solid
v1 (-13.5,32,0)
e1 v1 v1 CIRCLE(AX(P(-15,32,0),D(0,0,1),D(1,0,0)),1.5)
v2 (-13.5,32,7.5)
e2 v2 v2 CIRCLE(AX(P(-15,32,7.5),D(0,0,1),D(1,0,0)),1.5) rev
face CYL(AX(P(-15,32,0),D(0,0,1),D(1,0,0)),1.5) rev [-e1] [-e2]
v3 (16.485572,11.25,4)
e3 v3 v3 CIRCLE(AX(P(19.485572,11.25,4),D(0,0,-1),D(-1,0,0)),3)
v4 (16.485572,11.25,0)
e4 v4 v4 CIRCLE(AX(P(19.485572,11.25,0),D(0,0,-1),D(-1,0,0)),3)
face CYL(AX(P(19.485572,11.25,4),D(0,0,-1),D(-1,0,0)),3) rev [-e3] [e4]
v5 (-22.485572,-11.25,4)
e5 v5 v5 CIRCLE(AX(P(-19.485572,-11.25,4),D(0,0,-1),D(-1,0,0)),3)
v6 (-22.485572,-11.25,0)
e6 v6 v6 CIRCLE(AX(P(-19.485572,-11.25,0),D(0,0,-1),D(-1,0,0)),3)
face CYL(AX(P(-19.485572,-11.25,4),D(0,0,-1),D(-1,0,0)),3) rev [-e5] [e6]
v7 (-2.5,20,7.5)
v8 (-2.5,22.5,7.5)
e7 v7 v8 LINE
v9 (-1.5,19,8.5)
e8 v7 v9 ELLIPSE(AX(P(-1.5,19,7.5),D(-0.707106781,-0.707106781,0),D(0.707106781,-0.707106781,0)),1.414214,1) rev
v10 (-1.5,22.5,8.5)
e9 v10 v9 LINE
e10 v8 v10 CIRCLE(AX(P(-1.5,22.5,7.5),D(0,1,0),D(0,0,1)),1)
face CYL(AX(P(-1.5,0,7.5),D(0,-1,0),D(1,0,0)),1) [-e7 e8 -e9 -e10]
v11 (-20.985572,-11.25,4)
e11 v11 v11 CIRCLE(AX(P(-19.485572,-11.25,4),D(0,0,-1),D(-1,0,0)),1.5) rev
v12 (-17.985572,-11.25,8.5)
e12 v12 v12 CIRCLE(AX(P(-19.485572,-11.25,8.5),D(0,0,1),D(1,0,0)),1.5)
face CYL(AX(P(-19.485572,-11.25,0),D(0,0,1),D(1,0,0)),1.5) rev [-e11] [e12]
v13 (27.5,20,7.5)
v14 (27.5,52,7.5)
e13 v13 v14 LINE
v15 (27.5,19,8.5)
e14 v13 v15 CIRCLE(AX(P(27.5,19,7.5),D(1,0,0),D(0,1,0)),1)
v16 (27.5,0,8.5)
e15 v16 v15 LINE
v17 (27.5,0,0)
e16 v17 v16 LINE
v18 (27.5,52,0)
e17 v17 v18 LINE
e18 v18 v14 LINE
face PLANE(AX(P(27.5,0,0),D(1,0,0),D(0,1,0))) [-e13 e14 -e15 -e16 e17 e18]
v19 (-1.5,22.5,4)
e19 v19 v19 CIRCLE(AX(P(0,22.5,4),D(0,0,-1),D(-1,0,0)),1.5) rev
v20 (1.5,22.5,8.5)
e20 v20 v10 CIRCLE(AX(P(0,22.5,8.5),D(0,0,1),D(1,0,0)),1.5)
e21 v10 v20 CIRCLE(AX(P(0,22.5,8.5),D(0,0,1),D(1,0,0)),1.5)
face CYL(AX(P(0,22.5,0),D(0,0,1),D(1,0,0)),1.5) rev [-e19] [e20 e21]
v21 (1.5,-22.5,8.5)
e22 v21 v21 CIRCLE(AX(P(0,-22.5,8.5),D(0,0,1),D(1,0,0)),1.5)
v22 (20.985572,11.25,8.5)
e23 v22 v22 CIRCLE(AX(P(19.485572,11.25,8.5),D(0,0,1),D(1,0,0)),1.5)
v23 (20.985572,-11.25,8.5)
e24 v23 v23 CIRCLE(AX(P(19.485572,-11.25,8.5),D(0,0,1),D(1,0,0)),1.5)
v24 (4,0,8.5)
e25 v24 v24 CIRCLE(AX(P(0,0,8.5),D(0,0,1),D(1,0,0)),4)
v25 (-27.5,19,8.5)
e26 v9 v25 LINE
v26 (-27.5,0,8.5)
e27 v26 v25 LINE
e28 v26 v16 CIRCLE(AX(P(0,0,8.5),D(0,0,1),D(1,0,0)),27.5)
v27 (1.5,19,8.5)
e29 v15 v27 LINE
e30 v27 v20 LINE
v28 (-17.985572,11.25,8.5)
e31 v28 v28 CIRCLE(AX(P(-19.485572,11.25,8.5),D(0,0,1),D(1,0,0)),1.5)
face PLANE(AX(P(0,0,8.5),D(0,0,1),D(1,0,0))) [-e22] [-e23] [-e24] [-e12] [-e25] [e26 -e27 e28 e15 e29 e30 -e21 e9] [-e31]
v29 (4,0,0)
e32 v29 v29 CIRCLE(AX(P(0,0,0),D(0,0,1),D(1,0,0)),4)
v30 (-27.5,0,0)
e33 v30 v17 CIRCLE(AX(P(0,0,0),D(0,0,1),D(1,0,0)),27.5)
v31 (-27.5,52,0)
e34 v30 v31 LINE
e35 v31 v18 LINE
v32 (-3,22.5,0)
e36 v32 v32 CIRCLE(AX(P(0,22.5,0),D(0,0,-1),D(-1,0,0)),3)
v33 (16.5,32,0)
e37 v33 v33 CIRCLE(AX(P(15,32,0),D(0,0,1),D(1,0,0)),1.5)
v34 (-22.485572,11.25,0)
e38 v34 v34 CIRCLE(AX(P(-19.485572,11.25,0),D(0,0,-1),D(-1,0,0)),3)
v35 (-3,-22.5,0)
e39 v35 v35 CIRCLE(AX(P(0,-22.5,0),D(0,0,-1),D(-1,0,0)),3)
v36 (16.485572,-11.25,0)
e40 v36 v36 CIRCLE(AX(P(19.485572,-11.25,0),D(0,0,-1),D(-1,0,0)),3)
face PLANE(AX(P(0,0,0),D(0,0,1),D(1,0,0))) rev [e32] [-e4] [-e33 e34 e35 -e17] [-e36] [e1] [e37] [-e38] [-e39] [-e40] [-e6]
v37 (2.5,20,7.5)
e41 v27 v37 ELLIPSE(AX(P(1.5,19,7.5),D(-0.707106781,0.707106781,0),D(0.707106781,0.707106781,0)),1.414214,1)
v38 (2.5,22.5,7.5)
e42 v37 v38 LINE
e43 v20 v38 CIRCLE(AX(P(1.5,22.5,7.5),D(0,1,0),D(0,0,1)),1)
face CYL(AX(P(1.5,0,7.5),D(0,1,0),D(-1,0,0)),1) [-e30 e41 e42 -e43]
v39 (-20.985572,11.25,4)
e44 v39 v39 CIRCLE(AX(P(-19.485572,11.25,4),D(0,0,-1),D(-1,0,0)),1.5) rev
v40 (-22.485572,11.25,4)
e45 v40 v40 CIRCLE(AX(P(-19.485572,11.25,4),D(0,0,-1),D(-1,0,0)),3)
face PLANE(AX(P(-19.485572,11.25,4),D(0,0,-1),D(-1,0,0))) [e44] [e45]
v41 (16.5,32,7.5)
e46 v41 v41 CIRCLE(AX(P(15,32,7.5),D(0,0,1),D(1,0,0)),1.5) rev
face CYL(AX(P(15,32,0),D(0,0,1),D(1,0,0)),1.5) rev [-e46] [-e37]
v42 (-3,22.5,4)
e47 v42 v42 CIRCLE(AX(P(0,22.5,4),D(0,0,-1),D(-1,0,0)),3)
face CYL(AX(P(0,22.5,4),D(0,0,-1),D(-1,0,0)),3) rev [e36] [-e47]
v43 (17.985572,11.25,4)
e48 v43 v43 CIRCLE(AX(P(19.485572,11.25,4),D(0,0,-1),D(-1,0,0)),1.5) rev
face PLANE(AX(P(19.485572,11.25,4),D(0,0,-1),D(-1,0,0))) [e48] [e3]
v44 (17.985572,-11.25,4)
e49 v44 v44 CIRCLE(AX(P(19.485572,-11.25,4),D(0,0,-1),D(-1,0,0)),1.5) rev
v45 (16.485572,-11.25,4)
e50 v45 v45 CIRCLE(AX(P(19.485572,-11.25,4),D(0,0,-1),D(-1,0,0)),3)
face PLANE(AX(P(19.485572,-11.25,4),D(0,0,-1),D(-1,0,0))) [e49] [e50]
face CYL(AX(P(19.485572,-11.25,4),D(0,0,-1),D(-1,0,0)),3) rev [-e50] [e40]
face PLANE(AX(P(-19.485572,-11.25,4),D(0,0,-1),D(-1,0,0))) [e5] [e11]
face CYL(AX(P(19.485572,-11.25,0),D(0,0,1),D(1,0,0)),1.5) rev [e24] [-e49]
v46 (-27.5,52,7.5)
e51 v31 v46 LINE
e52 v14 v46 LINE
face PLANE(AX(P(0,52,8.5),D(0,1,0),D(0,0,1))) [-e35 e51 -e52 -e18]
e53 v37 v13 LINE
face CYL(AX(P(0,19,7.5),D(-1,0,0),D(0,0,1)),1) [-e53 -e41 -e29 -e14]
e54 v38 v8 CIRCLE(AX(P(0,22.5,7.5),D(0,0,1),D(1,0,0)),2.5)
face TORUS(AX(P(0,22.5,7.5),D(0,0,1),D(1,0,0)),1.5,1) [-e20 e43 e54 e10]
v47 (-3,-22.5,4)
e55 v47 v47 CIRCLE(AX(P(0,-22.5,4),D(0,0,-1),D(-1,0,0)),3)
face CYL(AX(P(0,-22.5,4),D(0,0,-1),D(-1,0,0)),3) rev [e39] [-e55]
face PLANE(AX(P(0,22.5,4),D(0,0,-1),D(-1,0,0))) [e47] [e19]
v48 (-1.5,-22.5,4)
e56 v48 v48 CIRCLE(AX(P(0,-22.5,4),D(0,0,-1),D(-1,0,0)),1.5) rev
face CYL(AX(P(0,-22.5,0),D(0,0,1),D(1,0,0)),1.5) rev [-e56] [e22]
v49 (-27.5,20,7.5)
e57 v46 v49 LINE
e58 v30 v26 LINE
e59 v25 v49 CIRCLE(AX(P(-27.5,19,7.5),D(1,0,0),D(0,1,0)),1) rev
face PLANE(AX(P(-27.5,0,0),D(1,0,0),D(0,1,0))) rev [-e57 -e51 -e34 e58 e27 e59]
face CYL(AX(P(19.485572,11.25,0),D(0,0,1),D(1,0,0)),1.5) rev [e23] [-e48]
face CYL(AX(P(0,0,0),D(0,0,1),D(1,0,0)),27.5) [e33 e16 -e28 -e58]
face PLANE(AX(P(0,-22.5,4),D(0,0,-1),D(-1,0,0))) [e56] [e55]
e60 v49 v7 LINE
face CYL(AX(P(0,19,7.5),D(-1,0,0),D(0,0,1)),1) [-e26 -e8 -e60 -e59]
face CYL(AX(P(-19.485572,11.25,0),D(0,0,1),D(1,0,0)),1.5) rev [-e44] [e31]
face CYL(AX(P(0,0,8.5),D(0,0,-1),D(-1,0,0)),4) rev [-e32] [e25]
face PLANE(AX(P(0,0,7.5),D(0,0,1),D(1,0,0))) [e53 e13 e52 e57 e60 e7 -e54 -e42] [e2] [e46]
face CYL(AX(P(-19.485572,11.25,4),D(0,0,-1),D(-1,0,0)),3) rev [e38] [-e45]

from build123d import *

# Parameters (mm, degrees)
ESQUISSE1_W             = 100
ESQUISSE1_H             = 100.548113933
ESQUISSE1_R             = 4
BOSS_EXTRU_1_DEPTH      = 8.5
ESQUISSE2_R             = 1.5
ENL_V_MAT_EXTRU_1_DEPTH = 73.637800077
ENL_V_MAT_EXTRU_6_DEPTH = 1
CONG_4_R                = 1
ESQUISSE4_R             = 3
ENL_V_MAT_EXTRU_7_DEPTH = 4


with BuildPart() as part:
    # Esquisse1 → Boss.-Extru.1 (new body)
    with BuildSketch(Plane.XY):
        with Locations((0, 1.725943033)):
            Rectangle(ESQUISSE1_W, ESQUISSE1_H)
        Circle(ESQUISSE1_R, mode=Mode.SUBTRACT)
    extrude(amount=BOSS_EXTRU_1_DEPTH)

    # Esquisse2 → Enlèv. mat.-Extru.1 (cut, through all)
    with BuildSketch(Plane.XY.offset(8.5)):
        with BuildLine():
            Line((27.5, 52), (27.5, 0))
            ThreePointArc((27.5, 0), (0, -27.5), (-27.5, 0))
            Line((-27.5, 0), (-27.5, 52))
            Line((-27.5, 52), (-50, 52))
            Line((-50, 52), (-50, -48.548113933))
            Line((-50, -48.548113933), (50, -48.548113933))
            Line((50, -48.548113933), (50, 52))
            Line((50, 52), (27.5, 52))
        make_face()
        with Locations((0, 22.5)):
            Circle(ESQUISSE2_R)
        with Locations((19.485571585, 11.25)):
            Circle(ESQUISSE2_R)
        with Locations((19.485571585, -11.25)):
            Circle(ESQUISSE2_R)
        with Locations((0, -22.5)):
            Circle(ESQUISSE2_R)
        with Locations((-19.485571585, -11.25)):
            Circle(ESQUISSE2_R)
        with Locations((-19.485571585, 11.25)):
            Circle(ESQUISSE2_R)
        with Locations((-15, 32)):
            Circle(ESQUISSE2_R)
        with Locations((15, 32)):
            Circle(ESQUISSE2_R)
    extrude(amount=-ENL_V_MAT_EXTRU_1_DEPTH, mode=Mode.SUBTRACT)

    # Esquisse3 → Enlèv. mat.-Extru.6 (cut)
    with BuildSketch(Plane.XY.offset(8.5)):
        with BuildLine():
            Line((27.5, 52), (-27.5, 52))
            Line((-27.5, 52), (-27.5, 20))
            Line((-27.5, 20), (-2.5, 20))
            Line((-2.5, 20), (-2.5, 22.5))
            ThreePointArc((-2.5, 22.5), (0, 25), (2.5, 22.5))
            Line((2.5, 22.5), (2.5, 20))
            Line((2.5, 20), (27.5, 20))
            Line((27.5, 20), (27.5, 52))
        make_face()
    extrude(amount=-ENL_V_MAT_EXTRU_6_DEPTH, mode=Mode.SUBTRACT)

    # Congé4
    cong_4_edges = [part.edges().sort_by_distance(p)[0] for p in [
        (-15, 20, 8.5),
        (15, 20, 8.5),
        (2.5, 21.25, 8.5),
        (-2.5, 21.25, 8.5),
        (0, 25, 8.5),
    ]]
    fillet(cong_4_edges, radius=CONG_4_R - 0.0001)  # a hair under: the kernel refuses the full size

    # Esquisse4 → Enlèv. mat.-Extru.7 (cut)
    with BuildSketch(Plane(origin=(0, 0, 0), x_dir=(-1, 0, 0), z_dir=(0, 0, -1))):
        with Locations((0, 22.5)):
            Circle(ESQUISSE4_R)
        with Locations((19.485571585, 11.25)):
            Circle(ESQUISSE4_R)
        with Locations((19.485571585, -11.25)):
            Circle(ESQUISSE4_R)
        with Locations((0, -22.5)):
            Circle(ESQUISSE4_R)
        with Locations((-19.485571585, -11.25)):
            Circle(ESQUISSE4_R)
        with Locations((-19.485571585, 11.25)):
            Circle(ESQUISSE4_R)
    extrude(amount=-ENL_V_MAT_EXTRU_7_DEPTH, mode=Mode.SUBTRACT)


solid = part.part
